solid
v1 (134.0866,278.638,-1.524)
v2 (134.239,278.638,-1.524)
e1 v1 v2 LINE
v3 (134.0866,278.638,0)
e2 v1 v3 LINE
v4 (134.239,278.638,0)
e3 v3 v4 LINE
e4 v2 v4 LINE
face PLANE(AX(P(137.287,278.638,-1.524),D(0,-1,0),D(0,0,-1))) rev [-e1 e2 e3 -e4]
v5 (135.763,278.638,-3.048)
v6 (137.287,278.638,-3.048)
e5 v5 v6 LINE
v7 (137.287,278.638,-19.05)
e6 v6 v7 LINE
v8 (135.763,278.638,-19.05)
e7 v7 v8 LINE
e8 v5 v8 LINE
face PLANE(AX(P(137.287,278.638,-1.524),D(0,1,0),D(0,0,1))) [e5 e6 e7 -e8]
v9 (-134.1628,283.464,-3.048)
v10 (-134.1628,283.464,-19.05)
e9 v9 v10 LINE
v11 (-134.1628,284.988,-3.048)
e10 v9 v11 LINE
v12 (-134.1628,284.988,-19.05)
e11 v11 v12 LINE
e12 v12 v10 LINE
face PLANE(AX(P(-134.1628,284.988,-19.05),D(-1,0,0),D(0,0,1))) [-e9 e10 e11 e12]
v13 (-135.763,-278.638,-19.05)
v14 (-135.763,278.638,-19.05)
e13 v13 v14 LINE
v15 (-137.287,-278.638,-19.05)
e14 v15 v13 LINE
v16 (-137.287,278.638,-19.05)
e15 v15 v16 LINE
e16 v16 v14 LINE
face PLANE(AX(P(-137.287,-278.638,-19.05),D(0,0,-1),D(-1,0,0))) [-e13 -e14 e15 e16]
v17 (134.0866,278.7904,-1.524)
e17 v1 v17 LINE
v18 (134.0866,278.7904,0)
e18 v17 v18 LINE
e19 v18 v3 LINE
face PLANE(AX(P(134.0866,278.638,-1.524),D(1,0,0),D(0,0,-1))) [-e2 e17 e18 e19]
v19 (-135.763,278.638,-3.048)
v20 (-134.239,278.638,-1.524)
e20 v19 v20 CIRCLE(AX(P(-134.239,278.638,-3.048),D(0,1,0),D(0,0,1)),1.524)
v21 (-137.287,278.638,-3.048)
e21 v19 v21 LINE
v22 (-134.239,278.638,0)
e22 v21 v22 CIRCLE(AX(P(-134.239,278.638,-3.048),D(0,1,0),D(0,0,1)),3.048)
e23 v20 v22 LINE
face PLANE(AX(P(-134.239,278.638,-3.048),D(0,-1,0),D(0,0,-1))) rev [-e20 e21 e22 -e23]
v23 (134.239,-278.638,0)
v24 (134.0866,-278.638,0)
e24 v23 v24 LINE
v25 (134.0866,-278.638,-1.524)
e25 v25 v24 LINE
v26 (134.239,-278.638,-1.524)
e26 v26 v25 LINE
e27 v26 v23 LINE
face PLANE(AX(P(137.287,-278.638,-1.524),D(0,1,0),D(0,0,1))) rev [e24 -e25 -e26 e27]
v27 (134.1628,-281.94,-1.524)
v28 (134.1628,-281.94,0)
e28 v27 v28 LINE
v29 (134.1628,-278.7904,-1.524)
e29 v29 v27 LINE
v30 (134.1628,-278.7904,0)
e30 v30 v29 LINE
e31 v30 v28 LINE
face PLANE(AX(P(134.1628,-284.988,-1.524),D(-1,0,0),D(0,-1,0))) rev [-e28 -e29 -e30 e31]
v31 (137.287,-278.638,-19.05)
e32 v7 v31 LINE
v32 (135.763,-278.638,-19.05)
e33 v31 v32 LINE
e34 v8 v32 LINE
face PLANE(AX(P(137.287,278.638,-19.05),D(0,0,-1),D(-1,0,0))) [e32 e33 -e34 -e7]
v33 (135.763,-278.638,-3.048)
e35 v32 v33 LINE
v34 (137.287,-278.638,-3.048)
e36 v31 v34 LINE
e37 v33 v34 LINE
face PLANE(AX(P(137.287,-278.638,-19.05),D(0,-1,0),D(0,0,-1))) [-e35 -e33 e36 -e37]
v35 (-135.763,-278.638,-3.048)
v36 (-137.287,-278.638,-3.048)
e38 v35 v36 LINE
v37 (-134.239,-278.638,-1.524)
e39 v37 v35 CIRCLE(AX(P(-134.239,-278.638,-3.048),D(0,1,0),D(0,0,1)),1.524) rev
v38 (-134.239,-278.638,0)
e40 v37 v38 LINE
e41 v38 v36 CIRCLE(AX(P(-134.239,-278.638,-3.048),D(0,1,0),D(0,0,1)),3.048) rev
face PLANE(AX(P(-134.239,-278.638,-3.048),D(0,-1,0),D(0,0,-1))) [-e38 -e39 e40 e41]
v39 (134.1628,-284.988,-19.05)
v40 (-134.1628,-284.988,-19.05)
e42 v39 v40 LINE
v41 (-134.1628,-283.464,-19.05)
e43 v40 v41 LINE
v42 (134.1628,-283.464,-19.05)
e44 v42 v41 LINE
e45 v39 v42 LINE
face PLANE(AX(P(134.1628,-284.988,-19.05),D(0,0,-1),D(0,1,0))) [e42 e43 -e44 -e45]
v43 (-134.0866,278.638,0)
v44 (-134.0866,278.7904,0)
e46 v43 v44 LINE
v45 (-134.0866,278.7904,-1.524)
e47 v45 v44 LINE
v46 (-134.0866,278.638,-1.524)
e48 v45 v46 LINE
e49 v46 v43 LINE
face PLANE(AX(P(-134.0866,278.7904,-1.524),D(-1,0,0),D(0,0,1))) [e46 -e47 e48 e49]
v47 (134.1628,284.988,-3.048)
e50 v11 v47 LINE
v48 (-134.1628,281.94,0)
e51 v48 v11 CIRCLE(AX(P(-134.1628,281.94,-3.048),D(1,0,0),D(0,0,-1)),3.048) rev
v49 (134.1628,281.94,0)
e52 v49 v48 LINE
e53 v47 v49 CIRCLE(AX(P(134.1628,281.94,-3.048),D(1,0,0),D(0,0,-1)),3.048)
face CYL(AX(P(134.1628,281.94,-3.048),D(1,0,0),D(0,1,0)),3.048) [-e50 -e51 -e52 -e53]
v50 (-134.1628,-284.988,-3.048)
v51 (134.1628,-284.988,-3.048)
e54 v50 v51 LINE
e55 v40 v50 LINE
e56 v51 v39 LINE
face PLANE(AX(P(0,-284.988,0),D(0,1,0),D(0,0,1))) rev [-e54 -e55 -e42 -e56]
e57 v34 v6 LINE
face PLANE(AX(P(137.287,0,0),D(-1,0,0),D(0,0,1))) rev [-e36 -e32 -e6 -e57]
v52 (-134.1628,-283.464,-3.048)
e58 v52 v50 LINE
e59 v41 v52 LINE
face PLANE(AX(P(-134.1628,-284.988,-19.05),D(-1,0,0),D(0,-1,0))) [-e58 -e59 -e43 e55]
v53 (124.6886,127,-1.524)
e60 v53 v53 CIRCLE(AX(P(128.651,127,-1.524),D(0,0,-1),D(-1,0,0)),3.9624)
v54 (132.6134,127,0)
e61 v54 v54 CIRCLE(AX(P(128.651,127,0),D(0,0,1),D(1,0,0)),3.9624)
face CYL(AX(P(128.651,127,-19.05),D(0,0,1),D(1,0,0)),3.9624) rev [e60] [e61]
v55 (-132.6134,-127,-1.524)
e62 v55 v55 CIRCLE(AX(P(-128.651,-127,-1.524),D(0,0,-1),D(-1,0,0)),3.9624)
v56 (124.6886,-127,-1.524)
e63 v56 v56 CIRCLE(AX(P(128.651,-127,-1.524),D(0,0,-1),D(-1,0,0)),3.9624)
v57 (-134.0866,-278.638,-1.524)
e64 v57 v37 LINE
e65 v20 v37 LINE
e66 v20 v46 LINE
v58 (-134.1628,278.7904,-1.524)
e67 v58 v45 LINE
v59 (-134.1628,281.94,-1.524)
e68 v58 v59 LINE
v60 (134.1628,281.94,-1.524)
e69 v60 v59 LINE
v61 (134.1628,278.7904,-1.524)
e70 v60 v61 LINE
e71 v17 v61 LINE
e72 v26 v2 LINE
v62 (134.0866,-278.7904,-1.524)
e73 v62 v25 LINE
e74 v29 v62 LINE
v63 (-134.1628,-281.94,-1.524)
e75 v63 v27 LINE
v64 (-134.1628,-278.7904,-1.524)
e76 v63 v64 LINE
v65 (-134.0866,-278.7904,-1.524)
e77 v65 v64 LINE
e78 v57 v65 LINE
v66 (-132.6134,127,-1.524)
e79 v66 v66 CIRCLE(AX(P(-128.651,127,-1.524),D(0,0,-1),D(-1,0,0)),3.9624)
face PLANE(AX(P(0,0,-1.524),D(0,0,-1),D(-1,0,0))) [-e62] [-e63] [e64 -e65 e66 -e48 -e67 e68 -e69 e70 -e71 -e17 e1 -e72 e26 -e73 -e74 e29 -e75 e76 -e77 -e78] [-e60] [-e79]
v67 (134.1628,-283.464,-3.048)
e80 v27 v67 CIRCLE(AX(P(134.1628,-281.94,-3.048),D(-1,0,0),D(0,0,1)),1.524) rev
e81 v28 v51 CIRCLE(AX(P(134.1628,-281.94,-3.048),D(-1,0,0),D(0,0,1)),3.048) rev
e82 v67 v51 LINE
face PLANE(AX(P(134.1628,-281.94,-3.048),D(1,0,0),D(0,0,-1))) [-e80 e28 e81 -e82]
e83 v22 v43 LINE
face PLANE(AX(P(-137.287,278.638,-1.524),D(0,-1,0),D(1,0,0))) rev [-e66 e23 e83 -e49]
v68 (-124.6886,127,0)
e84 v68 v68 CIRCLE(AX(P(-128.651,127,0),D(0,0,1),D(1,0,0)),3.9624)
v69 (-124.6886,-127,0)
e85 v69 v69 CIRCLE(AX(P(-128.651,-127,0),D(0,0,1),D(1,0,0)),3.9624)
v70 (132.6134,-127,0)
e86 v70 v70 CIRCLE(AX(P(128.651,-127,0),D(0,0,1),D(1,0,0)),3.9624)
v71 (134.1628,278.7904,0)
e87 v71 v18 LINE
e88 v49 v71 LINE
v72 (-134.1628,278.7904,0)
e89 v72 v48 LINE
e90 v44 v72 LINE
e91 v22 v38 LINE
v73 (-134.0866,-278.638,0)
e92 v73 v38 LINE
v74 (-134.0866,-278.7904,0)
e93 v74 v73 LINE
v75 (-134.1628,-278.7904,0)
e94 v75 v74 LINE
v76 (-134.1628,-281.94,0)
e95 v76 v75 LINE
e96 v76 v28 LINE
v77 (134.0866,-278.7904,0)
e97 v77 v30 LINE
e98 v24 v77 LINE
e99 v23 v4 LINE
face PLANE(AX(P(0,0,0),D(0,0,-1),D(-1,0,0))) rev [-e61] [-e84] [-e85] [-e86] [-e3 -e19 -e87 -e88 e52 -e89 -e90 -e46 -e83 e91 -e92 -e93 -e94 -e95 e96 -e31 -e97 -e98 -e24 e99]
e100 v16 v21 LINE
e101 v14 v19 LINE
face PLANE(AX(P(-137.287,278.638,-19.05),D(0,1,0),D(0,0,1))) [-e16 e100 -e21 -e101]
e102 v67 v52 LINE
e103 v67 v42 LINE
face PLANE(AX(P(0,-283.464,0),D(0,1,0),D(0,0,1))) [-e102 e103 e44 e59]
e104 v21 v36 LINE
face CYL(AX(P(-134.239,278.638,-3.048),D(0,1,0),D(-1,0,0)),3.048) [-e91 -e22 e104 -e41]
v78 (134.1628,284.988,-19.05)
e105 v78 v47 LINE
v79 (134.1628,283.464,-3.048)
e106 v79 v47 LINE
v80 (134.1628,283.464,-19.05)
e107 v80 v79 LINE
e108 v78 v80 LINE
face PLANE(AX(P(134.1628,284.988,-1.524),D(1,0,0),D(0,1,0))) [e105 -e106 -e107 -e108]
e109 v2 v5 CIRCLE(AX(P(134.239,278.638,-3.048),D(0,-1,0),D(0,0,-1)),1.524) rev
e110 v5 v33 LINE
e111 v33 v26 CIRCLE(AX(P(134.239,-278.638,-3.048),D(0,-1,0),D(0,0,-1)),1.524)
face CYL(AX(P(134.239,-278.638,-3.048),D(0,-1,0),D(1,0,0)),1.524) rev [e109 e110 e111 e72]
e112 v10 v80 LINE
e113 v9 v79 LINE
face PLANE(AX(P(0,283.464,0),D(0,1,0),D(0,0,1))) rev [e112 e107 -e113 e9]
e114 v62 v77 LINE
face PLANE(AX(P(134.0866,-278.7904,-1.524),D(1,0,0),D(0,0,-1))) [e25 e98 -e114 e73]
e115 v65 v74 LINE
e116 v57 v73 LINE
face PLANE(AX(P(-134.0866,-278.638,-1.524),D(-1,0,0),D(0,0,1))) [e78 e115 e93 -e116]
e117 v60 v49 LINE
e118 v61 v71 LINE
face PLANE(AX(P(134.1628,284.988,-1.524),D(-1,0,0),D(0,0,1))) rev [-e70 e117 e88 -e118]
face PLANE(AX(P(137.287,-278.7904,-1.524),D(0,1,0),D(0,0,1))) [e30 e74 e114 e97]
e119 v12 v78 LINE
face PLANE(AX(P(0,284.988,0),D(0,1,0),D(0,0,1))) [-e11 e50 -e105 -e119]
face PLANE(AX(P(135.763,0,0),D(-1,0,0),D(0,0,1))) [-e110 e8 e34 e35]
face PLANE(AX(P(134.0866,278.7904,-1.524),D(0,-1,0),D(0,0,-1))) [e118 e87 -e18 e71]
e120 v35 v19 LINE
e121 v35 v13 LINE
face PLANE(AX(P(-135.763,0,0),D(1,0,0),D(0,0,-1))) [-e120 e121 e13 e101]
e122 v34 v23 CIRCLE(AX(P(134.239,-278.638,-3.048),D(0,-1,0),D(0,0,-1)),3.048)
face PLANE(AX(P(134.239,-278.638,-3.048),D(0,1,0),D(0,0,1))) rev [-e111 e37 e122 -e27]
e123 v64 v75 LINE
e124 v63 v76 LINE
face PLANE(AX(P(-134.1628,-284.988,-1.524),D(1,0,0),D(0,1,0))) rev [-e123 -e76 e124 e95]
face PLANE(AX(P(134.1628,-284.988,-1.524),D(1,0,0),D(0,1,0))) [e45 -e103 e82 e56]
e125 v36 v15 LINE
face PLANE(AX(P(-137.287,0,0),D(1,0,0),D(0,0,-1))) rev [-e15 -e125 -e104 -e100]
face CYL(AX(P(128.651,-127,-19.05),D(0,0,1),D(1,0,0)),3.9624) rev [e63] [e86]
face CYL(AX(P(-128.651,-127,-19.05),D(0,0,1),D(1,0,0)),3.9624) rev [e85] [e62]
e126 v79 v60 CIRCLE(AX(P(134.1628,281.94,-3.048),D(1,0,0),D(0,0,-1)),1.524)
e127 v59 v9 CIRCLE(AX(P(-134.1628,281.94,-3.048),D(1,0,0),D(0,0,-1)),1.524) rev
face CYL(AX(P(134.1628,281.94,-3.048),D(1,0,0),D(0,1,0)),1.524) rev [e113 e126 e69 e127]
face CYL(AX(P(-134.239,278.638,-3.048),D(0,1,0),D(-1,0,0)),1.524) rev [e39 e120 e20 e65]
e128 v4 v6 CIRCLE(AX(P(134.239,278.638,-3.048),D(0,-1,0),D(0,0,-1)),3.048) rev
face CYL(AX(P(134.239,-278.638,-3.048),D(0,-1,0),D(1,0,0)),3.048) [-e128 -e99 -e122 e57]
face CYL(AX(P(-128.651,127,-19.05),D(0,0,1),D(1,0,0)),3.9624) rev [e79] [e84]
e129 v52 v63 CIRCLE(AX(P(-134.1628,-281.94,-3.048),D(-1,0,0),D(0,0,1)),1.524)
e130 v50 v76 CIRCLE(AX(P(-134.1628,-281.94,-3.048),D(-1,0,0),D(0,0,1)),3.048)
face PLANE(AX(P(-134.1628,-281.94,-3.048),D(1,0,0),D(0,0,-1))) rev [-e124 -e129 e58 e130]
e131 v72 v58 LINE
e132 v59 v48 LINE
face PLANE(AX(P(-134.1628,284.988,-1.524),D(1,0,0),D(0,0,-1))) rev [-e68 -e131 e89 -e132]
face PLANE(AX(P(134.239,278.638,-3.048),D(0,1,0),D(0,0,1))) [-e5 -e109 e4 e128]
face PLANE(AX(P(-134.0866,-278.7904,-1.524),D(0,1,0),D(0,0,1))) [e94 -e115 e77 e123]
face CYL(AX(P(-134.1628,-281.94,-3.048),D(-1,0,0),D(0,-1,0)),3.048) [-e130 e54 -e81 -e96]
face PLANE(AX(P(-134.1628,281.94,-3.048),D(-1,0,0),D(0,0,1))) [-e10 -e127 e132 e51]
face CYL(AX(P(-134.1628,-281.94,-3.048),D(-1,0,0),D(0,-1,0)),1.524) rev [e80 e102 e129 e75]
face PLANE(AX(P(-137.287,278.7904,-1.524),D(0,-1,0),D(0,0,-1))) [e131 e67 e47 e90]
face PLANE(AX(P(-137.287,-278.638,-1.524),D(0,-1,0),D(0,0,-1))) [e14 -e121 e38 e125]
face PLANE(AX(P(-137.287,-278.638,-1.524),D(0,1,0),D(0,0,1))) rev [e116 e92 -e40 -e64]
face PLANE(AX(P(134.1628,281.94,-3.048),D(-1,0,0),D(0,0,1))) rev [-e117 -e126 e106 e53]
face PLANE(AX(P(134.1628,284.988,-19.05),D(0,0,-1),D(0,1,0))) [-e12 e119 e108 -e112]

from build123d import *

# Parameters (mm, degrees)
CROQUIS1_W                   = 274.574
CROQUIS1_H                   = 569.976
BRIDA_BASE1_DEPTH            = 1.524
CROQUIS6_W                   = 3.1242
CROQUIS6_H                   = 6.35
CORTAR_EXTRUIR1_DEPTH        = 317.335586188
BRIDA_START                  = -134.1628
BRIDA_DE_ARISTA1_DEPTH       = 268.3256
BRIDA_START_2                = 6.35
BRIDA_DE_ARISTA1_2_DEPTH     = 557.276
BRIDA_DE_ARISTA1_3_DEPTH     = 268.3256
BRIDA_DE_ARISTA1_4_OUTLINE_W = 0.1524
BRIDA_DE_ARISTA1_4_OUTLINE_H = 1.524
BRIDA_DE_ARISTA1_4_DEPTH     = 0.0762
BRIDA_START_3                = 134.0866
BRIDA_DE_ARISTA1_5_OUTLINE_W = 0.1524
BRIDA_DE_ARISTA1_5_OUTLINE_H = 1.524
BRIDA_DE_ARISTA1_5_DEPTH     = 0.0762
BRIDA_DE_ARISTA1_6_DEPTH     = 557.276
CROQUIS19_R                  = 3.9624
CORTAR_EXTRUIR2_DEPTH        = 317.905006292


# Read off the part's stored shape, not the designer's step: Brida de arista1
# Sheet-metal steps are written as plain solids
with BuildPart() as part:
    # Croquis1 → Brida base1 (new body)
    with BuildSketch(Plane.XY):
        Rectangle(CROQUIS1_W, CROQUIS1_H)
    extrude(amount=-BRIDA_BASE1_DEPTH)

    # Croquis6 → Cortar-Extruir1 (cut, through all)
    with BuildSketch(Plane.XY):
        with Locations((135.7249, 281.813)):
            Rectangle(CROQUIS6_W, CROQUIS6_H)
        with Locations((-135.7249, 281.813)):
            Rectangle(CROQUIS6_W, CROQUIS6_H)
        with Locations((-135.7249, -281.813)):
            Rectangle(CROQUIS6_W, CROQUIS6_H)
        with Locations((135.7249, -281.813)):
            Rectangle(CROQUIS6_W, CROQUIS6_H)
    extrude(amount=-CORTAR_EXTRUIR1_DEPTH, mode=Mode.SUBTRACT)

    # Brida de arista1 outline → Brida de arista1 (add)
    with BuildSketch(Plane.YZ.offset(BRIDA_START)):
        with BuildLine():
            Line((284.988, -19.05), (284.988, -3.048))
            ThreePointArc((284.988, -3.048), (284.884141918, -2.259119551), (284.579645431, -1.524))
            Line((284.579645431, -1.524), (281.94, -1.524))
            ThreePointArc((281.94, -1.524), (283.017630735, -1.970369265), (283.464, -3.048))
            Line((283.464, -3.048), (283.464, -19.05))
            Line((283.464, -19.05), (284.988, -19.05))
        make_face()
        with BuildLine():
            ThreePointArc((-283.464, -3.048), (-283.017630735, -1.970369265), (-281.94, -1.524))
            Line((-281.94, -1.524), (-284.579645431, -1.524))
            ThreePointArc((-284.579645431, -1.524), (-284.884141918, -2.259119551), (-284.988, -3.048))
            Line((-284.988, -3.048), (-284.988, -19.05))
            Line((-284.988, -19.05), (-283.464, -19.05))
            Line((-283.464, -19.05), (-283.464, -3.048))
        make_face()
    extrude(amount=BRIDA_DE_ARISTA1_DEPTH)

    # Brida de arista1 2 outline → Brida de arista1 2 (add)
    with BuildSketch(Plane(origin=(0, 284.988, -1.524), x_dir=(-1, 0, 0), z_dir=(0, -1, 0)).offset(BRIDA_START_2)):
        with BuildLine():
            Line((-135.763, 1.524), (-135.763, 17.526))
            Line((-135.763, 17.526), (-137.287, 17.526))
            Line((-137.287, 17.526), (-137.287, 1.524))
            ThreePointArc((-137.287, 1.524), (-137.183141918, 0.735119551), (-136.878645431, 0))
            Line((-136.878645431, 0), (-134.239, 0))
            ThreePointArc((-134.239, 0), (-135.316630735, 0.446369265), (-135.763, 1.524))
        make_face()
        with BuildLine():
            ThreePointArc((135.763, 1.524), (135.316630735, 0.446369265), (134.239, 0))
            Line((134.239, 0), (136.878645431, 0))
            ThreePointArc((136.878645431, 0), (137.183141918, 0.735119551), (137.287, 1.524))
            Line((137.287, 1.524), (137.287, 17.526))
            Line((137.287, 17.526), (135.763, 17.526))
            Line((135.763, 17.526), (135.763, 1.524))
        make_face()
    extrude(amount=BRIDA_DE_ARISTA1_2_DEPTH)

    # Brida de arista1 3 outline → Brida de arista1 3 (cut)
    with BuildSketch(Plane.YZ.offset(BRIDA_START)):
        with BuildLine():
            ThreePointArc((281.94, 0), (283.464, -0.408354569), (284.579645431, -1.524))
            Line((284.579645431, -1.524), (284.988, -1.524))
            Line((284.988, -1.524), (284.988, 0))
            Line((284.988, 0), (281.94, 0))
        make_face()
        with BuildLine():
            ThreePointArc((-284.579645431, -1.524), (-283.464, -0.408354569), (-281.94, 0))
            Line((-281.94, 0), (-284.988, 0))
            Line((-284.988, 0), (-284.988, -1.524))
            Line((-284.988, -1.524), (-284.579645431, -1.524))
        make_face()
    extrude(amount=BRIDA_DE_ARISTA1_3_DEPTH, mode=Mode.SUBTRACT)

    # Brida de arista1 4 outline → Brida de arista1 4 (cut)
    with BuildSketch(Plane.YZ.offset(BRIDA_START)):
        with Locations((278.7142, -0.762)):
            Rectangle(BRIDA_DE_ARISTA1_4_OUTLINE_W, BRIDA_DE_ARISTA1_4_OUTLINE_H)
        with Locations((-278.7142, -0.762)):
            Rectangle(BRIDA_DE_ARISTA1_4_OUTLINE_W, BRIDA_DE_ARISTA1_4_OUTLINE_H)
    extrude(amount=BRIDA_DE_ARISTA1_4_DEPTH, mode=Mode.SUBTRACT)

    # Brida de arista1 5 outline → Brida de arista1 5 (cut)
    with BuildSketch(Plane.YZ.offset(BRIDA_START_3)):
        with Locations((278.7142, -0.762)):
            Rectangle(BRIDA_DE_ARISTA1_5_OUTLINE_W, BRIDA_DE_ARISTA1_5_OUTLINE_H)
        with Locations((-278.7142, -0.762)):
            Rectangle(BRIDA_DE_ARISTA1_5_OUTLINE_W, BRIDA_DE_ARISTA1_5_OUTLINE_H)
    extrude(amount=BRIDA_DE_ARISTA1_5_DEPTH, mode=Mode.SUBTRACT)

    # Brida de arista1 6 outline → Brida de arista1 6 (cut)
    with BuildSketch(Plane(origin=(0, 284.988, -1.524), x_dir=(-1, 0, 0), z_dir=(0, -1, 0)).offset(BRIDA_START_2)):
        with BuildLine():
            ThreePointArc((-134.239, -1.524), (-135.763, -1.115645431), (-136.878645431, 0))
            Line((-136.878645431, 0), (-137.287, 0))
            Line((-137.287, 0), (-137.287, -1.524))
            Line((-137.287, -1.524), (-134.239, -1.524))
        make_face()
        with BuildLine():
            Line((137.287, 0), (136.878645431, 0))
            ThreePointArc((136.878645431, 0), (135.763, -1.115645431), (134.239, -1.524))
            Line((134.239, -1.524), (137.287, -1.524))
            Line((137.287, -1.524), (137.287, 0))
        make_face()
    extrude(amount=BRIDA_DE_ARISTA1_6_DEPTH, mode=Mode.SUBTRACT)

    # Croquis19 → Cortar-Extruir2 (cut, through all)
    with BuildSketch(Plane.XY):
        with Locations((-128.651, 127)):
            Circle(CROQUIS19_R)
        with Locations((-128.651, -127)):
            Circle(CROQUIS19_R)
        with Locations((128.651, 127)):
            Circle(CROQUIS19_R)
        with Locations((128.651, -127)):
            Circle(CROQUIS19_R)
    extrude(amount=-CORTAR_EXTRUIR2_DEPTH, mode=Mode.SUBTRACT)


solid = part.part
